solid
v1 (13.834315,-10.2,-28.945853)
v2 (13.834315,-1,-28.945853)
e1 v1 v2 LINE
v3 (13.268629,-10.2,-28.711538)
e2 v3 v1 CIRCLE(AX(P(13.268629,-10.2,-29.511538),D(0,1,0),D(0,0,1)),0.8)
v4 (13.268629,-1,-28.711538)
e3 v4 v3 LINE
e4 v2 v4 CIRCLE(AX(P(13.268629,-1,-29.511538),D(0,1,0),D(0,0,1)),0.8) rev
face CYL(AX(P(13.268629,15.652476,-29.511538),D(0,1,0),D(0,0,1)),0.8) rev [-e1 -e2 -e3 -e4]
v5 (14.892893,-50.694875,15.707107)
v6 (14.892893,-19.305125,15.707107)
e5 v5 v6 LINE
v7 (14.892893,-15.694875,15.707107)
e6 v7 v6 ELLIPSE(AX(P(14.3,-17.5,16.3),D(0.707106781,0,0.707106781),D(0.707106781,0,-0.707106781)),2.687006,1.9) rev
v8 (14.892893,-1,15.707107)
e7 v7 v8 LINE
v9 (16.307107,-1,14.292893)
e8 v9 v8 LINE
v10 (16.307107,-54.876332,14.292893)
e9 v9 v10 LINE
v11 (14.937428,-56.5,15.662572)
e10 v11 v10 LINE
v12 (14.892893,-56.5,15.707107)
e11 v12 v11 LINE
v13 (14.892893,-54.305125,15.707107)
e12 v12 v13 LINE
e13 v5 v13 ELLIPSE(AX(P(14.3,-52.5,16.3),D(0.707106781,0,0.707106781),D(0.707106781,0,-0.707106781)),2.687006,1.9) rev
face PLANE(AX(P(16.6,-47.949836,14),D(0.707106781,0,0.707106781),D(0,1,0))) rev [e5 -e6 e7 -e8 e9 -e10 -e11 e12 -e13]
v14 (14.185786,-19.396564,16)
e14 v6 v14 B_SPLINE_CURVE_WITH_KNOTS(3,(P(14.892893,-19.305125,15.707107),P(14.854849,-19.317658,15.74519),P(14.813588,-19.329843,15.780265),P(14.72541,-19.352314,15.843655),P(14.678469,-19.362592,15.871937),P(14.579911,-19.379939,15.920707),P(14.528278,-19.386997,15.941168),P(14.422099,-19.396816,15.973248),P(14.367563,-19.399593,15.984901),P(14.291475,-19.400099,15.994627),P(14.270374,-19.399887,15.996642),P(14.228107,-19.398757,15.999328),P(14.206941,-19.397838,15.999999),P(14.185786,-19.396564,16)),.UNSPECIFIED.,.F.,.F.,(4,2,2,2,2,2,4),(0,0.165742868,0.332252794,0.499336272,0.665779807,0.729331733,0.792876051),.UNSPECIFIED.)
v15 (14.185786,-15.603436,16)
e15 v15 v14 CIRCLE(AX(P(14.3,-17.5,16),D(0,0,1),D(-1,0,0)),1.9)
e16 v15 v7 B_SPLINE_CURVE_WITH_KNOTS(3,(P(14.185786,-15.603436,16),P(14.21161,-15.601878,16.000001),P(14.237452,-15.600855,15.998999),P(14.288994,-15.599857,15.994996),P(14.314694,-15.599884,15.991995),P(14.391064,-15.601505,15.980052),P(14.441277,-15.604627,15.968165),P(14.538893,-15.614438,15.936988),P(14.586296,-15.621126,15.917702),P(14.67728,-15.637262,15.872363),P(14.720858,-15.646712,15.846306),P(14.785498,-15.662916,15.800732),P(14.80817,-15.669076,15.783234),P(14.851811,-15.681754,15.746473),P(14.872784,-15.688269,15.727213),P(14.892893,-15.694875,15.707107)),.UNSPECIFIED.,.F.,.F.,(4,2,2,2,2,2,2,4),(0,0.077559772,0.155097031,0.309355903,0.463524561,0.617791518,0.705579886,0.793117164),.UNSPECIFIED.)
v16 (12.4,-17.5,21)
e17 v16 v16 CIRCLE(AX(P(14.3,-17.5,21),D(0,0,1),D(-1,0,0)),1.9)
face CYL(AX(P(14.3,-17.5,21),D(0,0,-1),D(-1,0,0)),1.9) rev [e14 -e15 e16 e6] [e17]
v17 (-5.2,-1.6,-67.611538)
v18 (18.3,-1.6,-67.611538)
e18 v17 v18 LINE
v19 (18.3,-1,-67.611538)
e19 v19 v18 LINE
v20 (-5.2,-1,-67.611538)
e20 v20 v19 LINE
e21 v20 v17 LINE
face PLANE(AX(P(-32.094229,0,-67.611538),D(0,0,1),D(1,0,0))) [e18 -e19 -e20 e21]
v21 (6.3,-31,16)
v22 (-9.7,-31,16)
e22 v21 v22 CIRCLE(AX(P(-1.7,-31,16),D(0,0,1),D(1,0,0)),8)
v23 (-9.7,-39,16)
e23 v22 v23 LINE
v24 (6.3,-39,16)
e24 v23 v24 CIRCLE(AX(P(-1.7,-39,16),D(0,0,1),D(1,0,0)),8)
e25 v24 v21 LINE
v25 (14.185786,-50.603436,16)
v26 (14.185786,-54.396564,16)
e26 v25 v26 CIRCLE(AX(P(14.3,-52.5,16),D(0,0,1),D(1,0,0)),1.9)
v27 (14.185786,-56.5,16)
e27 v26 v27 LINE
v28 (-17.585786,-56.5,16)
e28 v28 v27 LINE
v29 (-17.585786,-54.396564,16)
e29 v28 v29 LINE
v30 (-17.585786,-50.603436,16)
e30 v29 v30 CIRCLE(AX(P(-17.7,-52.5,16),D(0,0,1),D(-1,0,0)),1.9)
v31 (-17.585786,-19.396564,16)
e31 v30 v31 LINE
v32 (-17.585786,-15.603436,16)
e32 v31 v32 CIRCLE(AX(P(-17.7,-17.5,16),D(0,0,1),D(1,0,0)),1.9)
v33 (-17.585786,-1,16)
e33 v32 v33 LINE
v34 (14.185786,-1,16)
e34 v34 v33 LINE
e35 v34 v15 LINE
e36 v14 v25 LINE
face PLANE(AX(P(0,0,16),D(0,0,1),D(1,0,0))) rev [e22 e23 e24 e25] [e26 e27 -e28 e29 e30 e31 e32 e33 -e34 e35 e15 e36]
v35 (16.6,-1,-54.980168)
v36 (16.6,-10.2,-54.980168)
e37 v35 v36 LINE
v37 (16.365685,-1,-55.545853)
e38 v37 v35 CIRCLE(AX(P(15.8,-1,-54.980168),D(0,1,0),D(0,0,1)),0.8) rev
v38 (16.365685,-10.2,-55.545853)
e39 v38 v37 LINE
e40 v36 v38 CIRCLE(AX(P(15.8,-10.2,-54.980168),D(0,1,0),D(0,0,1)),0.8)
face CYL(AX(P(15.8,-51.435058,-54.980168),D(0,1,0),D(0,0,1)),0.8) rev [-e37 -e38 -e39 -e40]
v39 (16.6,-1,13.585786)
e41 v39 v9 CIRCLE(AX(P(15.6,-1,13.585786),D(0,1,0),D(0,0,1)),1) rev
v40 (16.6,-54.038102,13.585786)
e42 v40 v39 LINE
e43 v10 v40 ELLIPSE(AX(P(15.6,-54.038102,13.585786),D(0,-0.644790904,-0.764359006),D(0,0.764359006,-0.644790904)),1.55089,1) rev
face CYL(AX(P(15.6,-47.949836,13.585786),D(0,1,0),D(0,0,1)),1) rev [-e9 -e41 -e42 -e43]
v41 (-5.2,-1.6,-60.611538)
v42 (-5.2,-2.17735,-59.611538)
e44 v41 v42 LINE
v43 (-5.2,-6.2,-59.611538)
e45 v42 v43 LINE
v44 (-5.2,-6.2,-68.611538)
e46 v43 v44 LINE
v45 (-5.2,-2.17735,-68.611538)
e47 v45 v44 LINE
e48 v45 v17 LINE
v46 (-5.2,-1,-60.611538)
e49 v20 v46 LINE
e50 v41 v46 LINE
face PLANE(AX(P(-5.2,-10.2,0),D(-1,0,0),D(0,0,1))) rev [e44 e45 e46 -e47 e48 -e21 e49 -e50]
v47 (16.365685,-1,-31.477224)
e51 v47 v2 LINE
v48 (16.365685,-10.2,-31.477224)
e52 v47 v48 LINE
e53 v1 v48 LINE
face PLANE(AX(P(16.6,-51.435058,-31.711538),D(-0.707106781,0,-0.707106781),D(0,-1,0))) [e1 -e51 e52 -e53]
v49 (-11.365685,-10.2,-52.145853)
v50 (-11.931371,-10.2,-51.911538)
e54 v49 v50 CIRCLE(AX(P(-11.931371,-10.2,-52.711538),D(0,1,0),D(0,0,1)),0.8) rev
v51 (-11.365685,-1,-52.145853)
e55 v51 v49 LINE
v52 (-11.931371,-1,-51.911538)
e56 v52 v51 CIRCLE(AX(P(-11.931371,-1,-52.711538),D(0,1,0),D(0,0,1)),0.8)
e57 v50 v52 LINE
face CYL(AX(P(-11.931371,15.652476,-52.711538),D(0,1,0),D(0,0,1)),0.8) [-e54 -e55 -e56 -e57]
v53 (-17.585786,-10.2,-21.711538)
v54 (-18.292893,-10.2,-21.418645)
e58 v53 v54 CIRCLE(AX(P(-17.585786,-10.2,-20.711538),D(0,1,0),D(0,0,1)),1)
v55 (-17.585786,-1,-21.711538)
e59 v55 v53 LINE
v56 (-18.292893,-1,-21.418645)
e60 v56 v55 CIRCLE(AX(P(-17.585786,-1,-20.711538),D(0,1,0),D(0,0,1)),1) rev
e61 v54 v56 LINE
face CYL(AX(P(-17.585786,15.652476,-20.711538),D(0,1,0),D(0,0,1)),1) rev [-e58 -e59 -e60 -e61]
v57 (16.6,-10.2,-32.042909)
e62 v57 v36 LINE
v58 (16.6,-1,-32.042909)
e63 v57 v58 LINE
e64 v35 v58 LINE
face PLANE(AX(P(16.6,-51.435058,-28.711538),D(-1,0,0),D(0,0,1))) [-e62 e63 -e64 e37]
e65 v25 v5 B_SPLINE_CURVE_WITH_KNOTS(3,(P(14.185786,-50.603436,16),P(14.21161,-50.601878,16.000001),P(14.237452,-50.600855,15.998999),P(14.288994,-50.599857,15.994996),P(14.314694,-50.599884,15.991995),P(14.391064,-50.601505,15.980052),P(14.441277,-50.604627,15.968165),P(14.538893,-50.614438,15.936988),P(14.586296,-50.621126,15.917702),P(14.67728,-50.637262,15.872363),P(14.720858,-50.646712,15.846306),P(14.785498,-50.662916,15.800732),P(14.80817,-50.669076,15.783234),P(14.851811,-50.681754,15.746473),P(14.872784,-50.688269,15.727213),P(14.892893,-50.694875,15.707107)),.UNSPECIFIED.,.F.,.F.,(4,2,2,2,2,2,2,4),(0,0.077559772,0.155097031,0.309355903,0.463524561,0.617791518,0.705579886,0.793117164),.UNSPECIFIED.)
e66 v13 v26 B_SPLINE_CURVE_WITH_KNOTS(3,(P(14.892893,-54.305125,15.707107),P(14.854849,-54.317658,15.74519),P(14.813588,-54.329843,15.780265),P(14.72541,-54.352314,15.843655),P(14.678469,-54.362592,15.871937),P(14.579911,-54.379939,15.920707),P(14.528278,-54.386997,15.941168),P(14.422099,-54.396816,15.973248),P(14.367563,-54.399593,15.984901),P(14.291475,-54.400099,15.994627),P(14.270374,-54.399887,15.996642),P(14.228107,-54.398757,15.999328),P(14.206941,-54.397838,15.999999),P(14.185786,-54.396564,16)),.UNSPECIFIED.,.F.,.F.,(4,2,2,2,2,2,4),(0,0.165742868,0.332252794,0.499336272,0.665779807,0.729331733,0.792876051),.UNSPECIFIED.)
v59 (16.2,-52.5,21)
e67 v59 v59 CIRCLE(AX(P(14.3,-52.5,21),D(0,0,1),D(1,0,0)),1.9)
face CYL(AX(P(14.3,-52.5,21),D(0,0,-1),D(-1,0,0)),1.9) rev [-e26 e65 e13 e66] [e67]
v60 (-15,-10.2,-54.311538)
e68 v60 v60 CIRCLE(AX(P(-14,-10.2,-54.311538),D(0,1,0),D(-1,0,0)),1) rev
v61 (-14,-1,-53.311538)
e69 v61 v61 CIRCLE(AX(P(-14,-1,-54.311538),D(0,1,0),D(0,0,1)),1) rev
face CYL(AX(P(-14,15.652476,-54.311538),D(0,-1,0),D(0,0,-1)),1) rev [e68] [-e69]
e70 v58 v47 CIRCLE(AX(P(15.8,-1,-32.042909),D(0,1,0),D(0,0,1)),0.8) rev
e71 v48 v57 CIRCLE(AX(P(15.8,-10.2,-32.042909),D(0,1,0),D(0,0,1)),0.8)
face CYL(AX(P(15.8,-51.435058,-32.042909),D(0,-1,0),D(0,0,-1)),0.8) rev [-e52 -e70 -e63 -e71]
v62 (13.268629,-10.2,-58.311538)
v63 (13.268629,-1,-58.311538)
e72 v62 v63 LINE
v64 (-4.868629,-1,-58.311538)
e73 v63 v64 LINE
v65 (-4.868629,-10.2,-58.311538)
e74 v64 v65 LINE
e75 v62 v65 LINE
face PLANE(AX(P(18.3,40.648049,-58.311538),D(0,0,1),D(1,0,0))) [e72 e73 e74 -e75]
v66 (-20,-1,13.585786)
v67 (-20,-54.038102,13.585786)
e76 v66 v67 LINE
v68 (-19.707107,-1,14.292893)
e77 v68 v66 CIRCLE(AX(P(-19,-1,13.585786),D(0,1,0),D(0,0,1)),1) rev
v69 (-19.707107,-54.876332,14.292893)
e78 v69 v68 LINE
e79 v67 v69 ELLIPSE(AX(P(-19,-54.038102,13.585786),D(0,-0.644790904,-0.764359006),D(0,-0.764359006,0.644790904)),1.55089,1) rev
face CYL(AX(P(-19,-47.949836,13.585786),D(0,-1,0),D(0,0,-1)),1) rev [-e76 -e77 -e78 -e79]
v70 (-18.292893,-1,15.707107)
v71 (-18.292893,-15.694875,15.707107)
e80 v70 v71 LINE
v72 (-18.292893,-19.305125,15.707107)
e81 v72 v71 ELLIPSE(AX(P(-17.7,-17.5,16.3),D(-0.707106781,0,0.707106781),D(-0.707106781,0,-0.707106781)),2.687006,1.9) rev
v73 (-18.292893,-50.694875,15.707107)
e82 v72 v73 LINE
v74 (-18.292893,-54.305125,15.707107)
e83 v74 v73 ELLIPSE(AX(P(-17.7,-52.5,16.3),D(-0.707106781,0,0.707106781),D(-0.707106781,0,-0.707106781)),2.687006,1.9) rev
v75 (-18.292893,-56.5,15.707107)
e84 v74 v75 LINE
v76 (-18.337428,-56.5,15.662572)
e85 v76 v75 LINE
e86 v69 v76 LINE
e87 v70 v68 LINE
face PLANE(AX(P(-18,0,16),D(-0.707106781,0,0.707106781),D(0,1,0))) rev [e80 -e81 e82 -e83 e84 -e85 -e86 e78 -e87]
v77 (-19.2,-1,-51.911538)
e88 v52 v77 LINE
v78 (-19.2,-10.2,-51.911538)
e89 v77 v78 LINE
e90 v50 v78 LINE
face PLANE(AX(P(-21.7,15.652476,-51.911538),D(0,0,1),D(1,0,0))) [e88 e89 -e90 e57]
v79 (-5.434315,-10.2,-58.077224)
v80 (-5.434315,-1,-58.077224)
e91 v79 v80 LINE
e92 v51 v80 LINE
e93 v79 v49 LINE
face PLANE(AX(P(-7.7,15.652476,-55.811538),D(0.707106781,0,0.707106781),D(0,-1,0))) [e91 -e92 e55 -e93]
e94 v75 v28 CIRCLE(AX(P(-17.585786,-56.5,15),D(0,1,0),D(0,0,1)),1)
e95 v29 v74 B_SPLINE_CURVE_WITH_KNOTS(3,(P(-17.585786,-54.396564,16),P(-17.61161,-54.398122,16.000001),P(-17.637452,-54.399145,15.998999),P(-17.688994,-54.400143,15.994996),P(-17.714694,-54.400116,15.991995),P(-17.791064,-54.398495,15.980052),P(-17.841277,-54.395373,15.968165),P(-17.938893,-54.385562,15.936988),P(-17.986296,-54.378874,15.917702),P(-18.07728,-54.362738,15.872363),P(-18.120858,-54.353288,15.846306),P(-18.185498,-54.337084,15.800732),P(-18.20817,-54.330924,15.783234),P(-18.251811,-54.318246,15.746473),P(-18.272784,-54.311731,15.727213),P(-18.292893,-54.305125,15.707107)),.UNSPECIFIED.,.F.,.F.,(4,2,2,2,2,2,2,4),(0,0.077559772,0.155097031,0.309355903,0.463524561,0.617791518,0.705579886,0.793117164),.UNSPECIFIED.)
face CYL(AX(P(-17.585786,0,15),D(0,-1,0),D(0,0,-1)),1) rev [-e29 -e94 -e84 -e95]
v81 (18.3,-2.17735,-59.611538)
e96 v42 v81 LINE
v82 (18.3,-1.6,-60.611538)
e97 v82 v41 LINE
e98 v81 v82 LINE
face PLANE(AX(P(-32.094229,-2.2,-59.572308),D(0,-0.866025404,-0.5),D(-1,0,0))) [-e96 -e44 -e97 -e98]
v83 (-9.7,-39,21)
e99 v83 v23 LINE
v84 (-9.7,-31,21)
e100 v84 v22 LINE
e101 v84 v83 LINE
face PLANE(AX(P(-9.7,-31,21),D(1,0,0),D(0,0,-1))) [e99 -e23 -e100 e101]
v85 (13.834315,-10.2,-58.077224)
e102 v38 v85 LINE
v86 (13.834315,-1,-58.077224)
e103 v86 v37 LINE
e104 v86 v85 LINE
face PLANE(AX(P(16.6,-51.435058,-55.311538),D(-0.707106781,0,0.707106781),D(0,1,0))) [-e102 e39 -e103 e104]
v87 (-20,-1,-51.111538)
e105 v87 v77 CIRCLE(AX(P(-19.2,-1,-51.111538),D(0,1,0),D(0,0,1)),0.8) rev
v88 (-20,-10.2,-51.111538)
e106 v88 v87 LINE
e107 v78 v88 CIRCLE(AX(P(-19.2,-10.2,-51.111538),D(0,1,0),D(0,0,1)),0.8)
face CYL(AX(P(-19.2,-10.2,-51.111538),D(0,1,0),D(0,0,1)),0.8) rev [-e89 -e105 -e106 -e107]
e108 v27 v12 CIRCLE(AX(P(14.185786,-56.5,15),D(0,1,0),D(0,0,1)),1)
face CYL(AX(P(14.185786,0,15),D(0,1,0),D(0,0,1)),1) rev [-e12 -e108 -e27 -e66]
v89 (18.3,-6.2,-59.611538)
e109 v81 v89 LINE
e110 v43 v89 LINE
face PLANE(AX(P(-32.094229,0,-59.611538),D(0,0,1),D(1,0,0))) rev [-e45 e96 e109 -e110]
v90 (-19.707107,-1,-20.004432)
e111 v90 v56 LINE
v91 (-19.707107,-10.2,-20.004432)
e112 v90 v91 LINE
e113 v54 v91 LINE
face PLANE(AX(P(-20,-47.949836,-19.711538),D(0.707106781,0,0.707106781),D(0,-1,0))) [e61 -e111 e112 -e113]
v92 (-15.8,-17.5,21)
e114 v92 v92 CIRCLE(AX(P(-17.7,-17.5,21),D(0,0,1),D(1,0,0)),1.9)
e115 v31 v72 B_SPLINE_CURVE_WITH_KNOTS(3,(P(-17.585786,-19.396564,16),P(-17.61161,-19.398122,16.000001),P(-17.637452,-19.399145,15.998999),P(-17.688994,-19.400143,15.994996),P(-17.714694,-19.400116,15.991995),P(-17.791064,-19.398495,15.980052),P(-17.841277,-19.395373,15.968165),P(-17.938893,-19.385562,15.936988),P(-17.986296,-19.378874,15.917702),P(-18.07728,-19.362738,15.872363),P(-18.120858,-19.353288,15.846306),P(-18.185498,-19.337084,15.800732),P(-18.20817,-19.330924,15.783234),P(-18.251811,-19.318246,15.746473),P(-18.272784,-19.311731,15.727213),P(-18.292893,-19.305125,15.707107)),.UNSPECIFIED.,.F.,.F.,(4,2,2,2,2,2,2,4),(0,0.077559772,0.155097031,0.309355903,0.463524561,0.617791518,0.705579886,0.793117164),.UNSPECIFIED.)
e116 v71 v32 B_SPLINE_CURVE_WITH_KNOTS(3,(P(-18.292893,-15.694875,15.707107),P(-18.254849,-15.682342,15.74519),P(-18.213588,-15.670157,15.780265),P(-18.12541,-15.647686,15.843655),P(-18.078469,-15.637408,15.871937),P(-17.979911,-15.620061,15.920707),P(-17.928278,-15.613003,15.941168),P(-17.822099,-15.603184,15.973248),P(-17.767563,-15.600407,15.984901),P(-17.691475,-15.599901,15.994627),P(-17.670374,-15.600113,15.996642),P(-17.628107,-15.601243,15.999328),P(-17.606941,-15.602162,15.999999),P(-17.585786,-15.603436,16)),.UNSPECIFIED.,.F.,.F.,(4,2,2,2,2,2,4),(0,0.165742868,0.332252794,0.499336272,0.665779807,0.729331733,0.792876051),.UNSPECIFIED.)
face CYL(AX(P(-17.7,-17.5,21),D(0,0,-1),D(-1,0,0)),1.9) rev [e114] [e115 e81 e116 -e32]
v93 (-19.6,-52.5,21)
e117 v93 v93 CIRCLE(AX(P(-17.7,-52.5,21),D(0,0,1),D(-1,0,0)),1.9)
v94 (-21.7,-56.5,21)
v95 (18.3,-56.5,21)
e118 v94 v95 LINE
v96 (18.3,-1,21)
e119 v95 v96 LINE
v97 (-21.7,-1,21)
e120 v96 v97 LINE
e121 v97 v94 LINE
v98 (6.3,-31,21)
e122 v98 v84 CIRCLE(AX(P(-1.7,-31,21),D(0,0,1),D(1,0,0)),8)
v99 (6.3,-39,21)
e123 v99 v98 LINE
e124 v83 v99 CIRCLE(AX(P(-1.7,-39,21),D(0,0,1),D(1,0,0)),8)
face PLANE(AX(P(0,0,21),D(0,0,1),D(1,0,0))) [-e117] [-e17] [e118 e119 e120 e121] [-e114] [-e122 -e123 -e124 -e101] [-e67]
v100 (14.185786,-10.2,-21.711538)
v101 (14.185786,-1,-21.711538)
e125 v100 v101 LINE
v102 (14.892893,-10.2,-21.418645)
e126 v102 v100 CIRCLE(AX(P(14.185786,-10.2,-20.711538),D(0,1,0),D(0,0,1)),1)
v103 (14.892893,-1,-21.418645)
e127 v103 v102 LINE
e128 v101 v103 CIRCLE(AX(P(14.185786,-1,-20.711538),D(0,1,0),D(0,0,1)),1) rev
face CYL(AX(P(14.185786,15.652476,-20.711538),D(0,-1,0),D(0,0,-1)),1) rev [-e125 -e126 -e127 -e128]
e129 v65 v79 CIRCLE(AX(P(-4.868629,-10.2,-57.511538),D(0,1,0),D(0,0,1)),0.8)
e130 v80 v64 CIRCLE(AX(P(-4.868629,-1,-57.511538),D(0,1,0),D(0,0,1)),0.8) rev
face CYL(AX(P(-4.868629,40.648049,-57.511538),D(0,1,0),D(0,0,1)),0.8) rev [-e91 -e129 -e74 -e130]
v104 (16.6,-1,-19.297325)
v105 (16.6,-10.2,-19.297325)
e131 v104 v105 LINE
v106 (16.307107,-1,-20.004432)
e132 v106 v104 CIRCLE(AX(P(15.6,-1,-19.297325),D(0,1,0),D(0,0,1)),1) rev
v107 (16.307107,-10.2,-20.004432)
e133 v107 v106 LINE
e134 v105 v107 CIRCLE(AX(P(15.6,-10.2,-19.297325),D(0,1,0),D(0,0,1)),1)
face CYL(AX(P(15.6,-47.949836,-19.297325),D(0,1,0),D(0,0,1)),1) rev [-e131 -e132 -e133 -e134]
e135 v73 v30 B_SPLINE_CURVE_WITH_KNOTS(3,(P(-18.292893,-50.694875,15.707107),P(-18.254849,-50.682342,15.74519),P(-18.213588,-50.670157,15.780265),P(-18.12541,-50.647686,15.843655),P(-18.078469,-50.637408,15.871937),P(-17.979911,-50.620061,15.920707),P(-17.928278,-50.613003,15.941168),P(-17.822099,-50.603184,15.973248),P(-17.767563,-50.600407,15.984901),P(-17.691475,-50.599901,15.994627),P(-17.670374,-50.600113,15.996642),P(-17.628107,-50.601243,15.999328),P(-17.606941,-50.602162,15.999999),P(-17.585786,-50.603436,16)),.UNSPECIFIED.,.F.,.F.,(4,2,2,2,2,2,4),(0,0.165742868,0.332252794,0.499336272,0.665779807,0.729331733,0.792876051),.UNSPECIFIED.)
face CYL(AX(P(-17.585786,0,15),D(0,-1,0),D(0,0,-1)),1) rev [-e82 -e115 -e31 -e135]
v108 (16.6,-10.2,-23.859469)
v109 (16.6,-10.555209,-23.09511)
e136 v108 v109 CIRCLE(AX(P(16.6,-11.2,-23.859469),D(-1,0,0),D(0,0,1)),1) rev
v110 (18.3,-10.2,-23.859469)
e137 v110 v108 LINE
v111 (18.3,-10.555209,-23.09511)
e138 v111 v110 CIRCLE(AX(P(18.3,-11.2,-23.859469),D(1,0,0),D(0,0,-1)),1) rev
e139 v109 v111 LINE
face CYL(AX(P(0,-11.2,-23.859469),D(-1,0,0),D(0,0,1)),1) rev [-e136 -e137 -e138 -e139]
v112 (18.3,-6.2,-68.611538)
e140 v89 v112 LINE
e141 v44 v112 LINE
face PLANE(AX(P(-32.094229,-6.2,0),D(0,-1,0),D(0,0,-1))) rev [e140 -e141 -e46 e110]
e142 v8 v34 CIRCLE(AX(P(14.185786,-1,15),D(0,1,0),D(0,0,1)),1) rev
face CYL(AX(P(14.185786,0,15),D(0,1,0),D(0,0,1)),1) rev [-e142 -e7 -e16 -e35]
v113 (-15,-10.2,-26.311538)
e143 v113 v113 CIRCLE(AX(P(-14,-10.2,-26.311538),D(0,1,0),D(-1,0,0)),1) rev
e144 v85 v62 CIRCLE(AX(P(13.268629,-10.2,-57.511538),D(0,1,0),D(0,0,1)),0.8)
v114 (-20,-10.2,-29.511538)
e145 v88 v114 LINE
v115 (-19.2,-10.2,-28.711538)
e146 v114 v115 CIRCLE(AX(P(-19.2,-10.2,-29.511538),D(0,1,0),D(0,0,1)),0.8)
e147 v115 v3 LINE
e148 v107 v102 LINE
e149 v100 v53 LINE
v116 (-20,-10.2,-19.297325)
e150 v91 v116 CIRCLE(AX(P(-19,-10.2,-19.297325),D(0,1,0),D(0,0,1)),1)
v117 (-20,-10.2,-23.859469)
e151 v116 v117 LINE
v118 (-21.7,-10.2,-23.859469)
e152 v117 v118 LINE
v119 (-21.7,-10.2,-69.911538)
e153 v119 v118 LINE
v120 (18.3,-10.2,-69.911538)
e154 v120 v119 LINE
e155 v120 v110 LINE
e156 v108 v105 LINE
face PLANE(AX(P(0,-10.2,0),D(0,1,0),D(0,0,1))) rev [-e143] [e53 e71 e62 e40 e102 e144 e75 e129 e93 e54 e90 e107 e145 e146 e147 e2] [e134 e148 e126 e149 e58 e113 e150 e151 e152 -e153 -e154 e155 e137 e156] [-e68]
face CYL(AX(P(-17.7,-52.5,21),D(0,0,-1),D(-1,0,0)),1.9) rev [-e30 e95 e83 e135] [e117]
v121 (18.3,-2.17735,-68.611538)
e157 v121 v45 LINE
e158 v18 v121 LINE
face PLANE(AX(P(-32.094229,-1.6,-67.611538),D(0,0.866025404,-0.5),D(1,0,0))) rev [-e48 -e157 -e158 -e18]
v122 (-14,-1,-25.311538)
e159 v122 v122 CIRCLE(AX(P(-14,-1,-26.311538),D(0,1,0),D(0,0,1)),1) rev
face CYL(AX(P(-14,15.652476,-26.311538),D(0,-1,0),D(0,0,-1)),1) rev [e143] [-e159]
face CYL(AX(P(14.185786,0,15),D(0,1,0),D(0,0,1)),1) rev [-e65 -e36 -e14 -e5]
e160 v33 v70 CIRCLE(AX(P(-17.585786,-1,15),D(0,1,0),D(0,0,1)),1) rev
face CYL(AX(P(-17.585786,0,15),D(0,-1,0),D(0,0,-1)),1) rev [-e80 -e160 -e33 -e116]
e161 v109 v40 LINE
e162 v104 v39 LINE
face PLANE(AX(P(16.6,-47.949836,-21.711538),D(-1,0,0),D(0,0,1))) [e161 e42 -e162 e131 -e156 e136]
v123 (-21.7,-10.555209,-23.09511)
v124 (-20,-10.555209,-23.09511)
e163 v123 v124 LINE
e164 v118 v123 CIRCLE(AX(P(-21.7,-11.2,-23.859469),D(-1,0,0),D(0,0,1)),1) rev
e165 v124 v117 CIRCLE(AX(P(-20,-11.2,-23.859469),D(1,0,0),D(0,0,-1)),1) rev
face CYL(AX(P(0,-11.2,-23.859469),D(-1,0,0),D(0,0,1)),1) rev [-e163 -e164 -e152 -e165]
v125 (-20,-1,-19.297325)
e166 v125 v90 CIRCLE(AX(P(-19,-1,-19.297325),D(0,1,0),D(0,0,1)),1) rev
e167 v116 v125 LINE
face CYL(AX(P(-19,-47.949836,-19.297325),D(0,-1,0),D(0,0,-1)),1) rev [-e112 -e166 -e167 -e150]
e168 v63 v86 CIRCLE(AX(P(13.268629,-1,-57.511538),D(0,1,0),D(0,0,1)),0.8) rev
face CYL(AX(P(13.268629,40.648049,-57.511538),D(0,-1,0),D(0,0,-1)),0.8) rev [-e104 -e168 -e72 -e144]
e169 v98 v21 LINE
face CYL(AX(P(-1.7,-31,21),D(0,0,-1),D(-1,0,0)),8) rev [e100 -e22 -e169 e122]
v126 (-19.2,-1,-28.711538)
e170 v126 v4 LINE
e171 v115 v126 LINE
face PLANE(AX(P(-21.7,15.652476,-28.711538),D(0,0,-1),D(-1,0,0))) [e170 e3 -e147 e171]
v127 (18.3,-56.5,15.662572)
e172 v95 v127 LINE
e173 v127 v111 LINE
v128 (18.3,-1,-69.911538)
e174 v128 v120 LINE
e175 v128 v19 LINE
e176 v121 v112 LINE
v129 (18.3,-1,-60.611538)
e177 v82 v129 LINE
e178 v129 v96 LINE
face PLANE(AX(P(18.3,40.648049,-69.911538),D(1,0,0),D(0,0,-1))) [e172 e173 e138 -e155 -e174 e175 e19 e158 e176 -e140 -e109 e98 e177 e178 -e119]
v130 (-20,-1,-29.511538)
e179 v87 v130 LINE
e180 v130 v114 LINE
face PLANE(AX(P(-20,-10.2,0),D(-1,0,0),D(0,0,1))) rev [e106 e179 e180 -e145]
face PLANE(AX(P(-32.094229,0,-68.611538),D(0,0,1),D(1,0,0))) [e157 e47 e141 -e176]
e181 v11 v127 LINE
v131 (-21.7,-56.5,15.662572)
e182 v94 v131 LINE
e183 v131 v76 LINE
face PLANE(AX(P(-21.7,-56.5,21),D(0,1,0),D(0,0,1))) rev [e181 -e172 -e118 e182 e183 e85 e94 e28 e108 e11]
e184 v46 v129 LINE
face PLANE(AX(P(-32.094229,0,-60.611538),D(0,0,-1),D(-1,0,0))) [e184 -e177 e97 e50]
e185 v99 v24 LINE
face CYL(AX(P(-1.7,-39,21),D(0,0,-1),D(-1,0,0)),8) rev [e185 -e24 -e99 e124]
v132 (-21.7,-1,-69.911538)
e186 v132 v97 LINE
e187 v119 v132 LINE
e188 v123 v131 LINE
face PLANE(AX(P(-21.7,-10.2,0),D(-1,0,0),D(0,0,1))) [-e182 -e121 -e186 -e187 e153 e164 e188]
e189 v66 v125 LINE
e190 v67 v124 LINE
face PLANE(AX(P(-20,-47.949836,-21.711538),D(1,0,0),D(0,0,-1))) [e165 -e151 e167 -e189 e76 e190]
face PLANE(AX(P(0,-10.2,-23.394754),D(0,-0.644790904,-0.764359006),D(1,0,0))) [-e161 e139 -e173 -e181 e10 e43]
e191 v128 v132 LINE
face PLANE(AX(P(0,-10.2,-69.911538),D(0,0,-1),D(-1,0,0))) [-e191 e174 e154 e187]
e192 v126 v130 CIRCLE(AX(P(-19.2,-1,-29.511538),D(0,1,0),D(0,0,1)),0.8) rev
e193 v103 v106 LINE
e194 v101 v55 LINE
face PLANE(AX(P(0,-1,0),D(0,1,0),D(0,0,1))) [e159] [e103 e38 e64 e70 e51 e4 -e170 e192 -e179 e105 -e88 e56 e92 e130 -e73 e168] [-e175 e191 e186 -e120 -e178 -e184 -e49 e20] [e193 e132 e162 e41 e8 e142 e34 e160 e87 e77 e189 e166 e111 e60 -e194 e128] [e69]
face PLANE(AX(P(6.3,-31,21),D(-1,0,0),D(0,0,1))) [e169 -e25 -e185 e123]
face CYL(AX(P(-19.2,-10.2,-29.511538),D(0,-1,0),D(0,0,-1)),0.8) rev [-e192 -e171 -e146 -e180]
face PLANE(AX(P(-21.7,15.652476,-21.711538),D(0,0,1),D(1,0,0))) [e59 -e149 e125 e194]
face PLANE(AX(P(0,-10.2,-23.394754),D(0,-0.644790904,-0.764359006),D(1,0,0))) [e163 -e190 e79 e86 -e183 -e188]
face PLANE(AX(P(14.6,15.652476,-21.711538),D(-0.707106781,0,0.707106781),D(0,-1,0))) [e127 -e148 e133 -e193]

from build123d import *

# Parameters (mm, degrees)
BOSS_EXTRUDE1_START      = -1
SKETCH1_W                = 1.7
SKETCH1_H                = 89.2
BOSS_EXTRUDE1_DEPTH      = 9.2
SKETCH4_W                = 40
SKETCH4_H                = 11.6
BOSS_EXTRUDE3_DEPTH      = 9.2
SERVO_HOLDER_DEPTH       = 1
SERVO_HOLDER_DEPTH_BACK  = 9.2
SKETCH3_W                = 14
SKETCH3_H                = 7
SKETCH3_R                = 1
SKETCH37_W               = 26
SKETCH37_H               = 7
BOSS_EXTRUDE19_DEPTH     = 10.2
CUT_EXTRUDE10_DEPTH      = 93.482268571
CUT_EXTRUDE10_DEPTH_BACK = 93.482268571
SKETCH29_W               = 49.101454262
SKETCH29_H               = 5.977389624
BOSS_EXTRUDE17_DEPTH     = 3
SKETCH39_W               = 1.7
SKETCH39_H               = 41.2
BOSS_EXTRUDE20_DEPTH     = 9.2
CUT_EXTRUDE13_DEPTH      = 23.5
CHAMFER2_SIZE            = 0.6
CHAMFER2_SIZE_2          = 1.039230485
CHAMFER3_SIZE            = 3
CHAMFER4_SIZE            = 2.5
CUT_EXTRUDE16_DEPTH      = 10
FILLET11_R               = 0.8
SKETCH51_W               = 40
SKETCH51_H               = 41
CUT_EXTRUDE17_DEPTH      = 10
SKETCH50_W               = 40
SKETCH50_H               = 55.5
SKETCH50_R               = 1.9
BOSS_EXTRUDE24_DEPTH     = 5
SKETCH53_W               = 1.7
SKETCH53_H               = 37.711538462
BOSS_EXTRUDE25_DEPTH     = 9.2
CHAMFER6_START           = -21.7
CHAMFER6_DEPTH           = 1.7
CHAMFER6_START_2         = 16.6
CHAMFER6_2_DEPTH         = 1.7
CHAMFER5_SIZE            = 2
FILLET13_R               = 1


with BuildPart() as part:
    # Sketch1 → Boss-Extrude1 (new body)
    with BuildSketch(Plane(origin=(0, 0, 0), x_dir=(1, 0, 0), z_dir=(0, 1, 0)).offset(BOSS_EXTRUDE1_START)):
        with Locations((-20.85, 25.311538462)):
            Rectangle(SKETCH1_W, SKETCH1_H)
    extrude(amount=-BOSS_EXTRUDE1_DEPTH)

    # Sketch4 → Boss-Extrude3 (add)
    with BuildSketch(Plane.XZ.offset(10.2)):
        with Locations((-1.7, -64.111538462)):
            Rectangle(SKETCH4_W, SKETCH4_H)
    extrude(amount=-BOSS_EXTRUDE3_DEPTH)

    # Sketch3 → Servo Holder (add, two sides: drawn at the far end of the back side and taken through both)
    # profile 1 of 2: a face of its own
    with BuildSketch(Plane.XZ.offset(10.2).offset(-SERVO_HOLDER_DEPTH_BACK)):
        with Locations((-14.7, -55.411538462)):
            Rectangle(SKETCH3_W, SKETCH3_H)
        with Locations(Location((-14, -54.311538462, 0), (0, 0, 270))):
            Circle(SKETCH3_R, mode=Mode.SUBTRACT)
    # profile 2 of 2: a face of its own
    with BuildSketch(Plane.XZ.offset(10.2).offset(-SERVO_HOLDER_DEPTH_BACK)):
        with Locations((-14.7, -25.211538462)):
            Rectangle(SKETCH3_W, SKETCH3_H)
        with Locations(Location((-14, -26.311538462, 0), (0, 0, 90))):
            Circle(SKETCH3_R, mode=Mode.SUBTRACT)
    extrude(amount=SERVO_HOLDER_DEPTH + SERVO_HOLDER_DEPTH_BACK)

    # Sketch37 → Boss-Extrude19 (add)
    with BuildSketch(Plane(origin=(0, -1, 0), x_dir=(1, 0, 0), z_dir=(0, 1, 0))):
        with Locations((5.3, 25.211538462)):
            Rectangle(SKETCH37_W, SKETCH37_H)
    extrude(amount=-BOSS_EXTRUDE19_DEPTH)

    # Sketch29 → Cut-Extrude10 (cut, two sides: drawn at the far end of the back side and taken through both)
    with BuildSketch(Plane(origin=(0, 0, -69.911538462), x_dir=(-1, 0, 0), z_dir=(0, 0, -1)).offset(-CUT_EXTRUDE10_DEPTH_BACK)):
        with Locations((-2.850727131, -13.188694812)):
            Rectangle(SKETCH29_W, SKETCH29_H)
    extrude(amount=CUT_EXTRUDE10_DEPTH + CUT_EXTRUDE10_DEPTH_BACK, mode=Mode.SUBTRACT)

    # Sketch35 → Boss-Extrude17 (add)
    with BuildSketch(Plane(origin=(18.3, 0, 0), x_dir=(0, 0, -1), z_dir=(1, 0, 0))):
        Polygon((-2, -1), (21.711538462, -1), (21.711538462, -10.2), (-19.288461538, -10.2), (-19.288461538, -1), align=None)
    extrude(amount=-BOSS_EXTRUDE17_DEPTH)

    # Sketch39 → Boss-Extrude20 (add)
    with BuildSketch(Plane(origin=(0, -1, 0), x_dir=(1, 0, 0), z_dir=(0, 1, 0))):
        with Locations((17.45, 49.311538462)):
            Rectangle(SKETCH39_W, SKETCH39_H)
    extrude(amount=-BOSS_EXTRUDE20_DEPTH)

    # Sketch40 → Cut-Extrude13 (cut)
    with BuildSketch(Plane(origin=(18.3, 0, 0), x_dir=(0, 0, -1), z_dir=(1, 0, 0))):
        Polygon((64.111538462, -1), (60.611538462, -1), (60.611538462, -2.2), (59.611538462, -2.2), (59.611538462, -6.2), (64.111538462, -6.2), align=None)
        Polygon((67.611538462, -1), (64.111538462, -1), (64.111538462, -6.2), (68.611538462, -6.2), (68.611538462, -2.2), (67.611538462, -2.2), align=None)
    extrude(amount=-CUT_EXTRUDE13_DEPTH, mode=Mode.SUBTRACT)

    # Chamfer2
    # the kernel refuses this chamfer: 1.039230485, 0.6 mm, written as the material it takes off along each edge
    with BuildSketch(Plane(origin=(20.988578382, -2.2, -60.611538462), x_dir=(0, 1, 0), z_dir=(-1, 0, 0))) as chamfer2_piece_1_section:
        Polygon((CHAMFER2_SIZE, 0), (0, -CHAMFER2_SIZE_2), (0, 0), align=None)
    chamfer2_piece_1 = extrude(amount=26.188578382, mode=Mode.PRIVATE)
    chamfer2_piece_1 = split(chamfer2_piece_1, bisect_by=Plane(origin=(20.988578382, -2.2, -59.611538462), z_dir=(0, 0, -1)), keep=Keep.TOP, mode=Mode.PRIVATE)
    add(chamfer2_piece_1, mode=Mode.SUBTRACT)
    with BuildSketch(Plane(origin=(20.988578382, -2.2, -67.611538462), x_dir=(0, 1, 0), z_dir=(-1, 0, 0))) as chamfer2_piece_2_section:
        Polygon((CHAMFER2_SIZE, 0), (0, CHAMFER2_SIZE_2), (0, 0), align=None)
    chamfer2_piece_2 = extrude(amount=26.188578382, mode=Mode.PRIVATE)
    chamfer2_piece_2 = split(chamfer2_piece_2, bisect_by=Plane(origin=(20.988578382, -2.2, -68.611538462), z_dir=(0, 0, 1)), keep=Keep.TOP, mode=Mode.PRIVATE)
    add(chamfer2_piece_2, mode=Mode.SUBTRACT)

    # Chamfer3
    chamfer3_edges = [part.edges().sort_by_distance(p)[0] for p in [
        (16.6, -5.6, -58.311538462),
        (16.6, -5.6, -28.711538462),
    ]]
    chamfer(chamfer3_edges, length=CHAMFER3_SIZE)

    # Chamfer4
    chamfer4_edges = [part.edges().sort_by_distance(p)[0] for p in [
        (-7.7, -5.6, -58.311538462),
    ]]
    chamfer(chamfer4_edges, length=CHAMFER4_SIZE)

    # Sketch43 → Cut-Extrude16 (cut)
    with BuildSketch(Plane(origin=(0, -1, 0), x_dir=(1, 0, 0), z_dir=(0, 1, 0))):
        Polygon((-5.2, 58.311538462), (-11.6, 51.911538462), (-5.2, 51.911538462), align=None)
    extrude(amount=-CUT_EXTRUDE16_DEPTH, mode=Mode.SUBTRACT)

    # Fillet11
    fillet11_edges = [part.edges().sort_by_distance(p)[0] for p in [
        (16.6, -5.6, -55.311538462),
        (16.6, -5.6, -31.711538462),
        (13.6, -5.6, -28.711538462),
        (13.6, -5.6, -58.311538462),
        (-5.2, -5.6, -58.311538462),
        (-11.6, -5.6, -51.911538462),
        (-20, -5.6, -51.911538462),
        (-20, -5.6, -28.711538462),
    ]]
    fillet(fillet11_edges, radius=FILLET11_R)

    # Sketch51 → Cut-Extrude17 (cut)
    with BuildSketch(Plane(origin=(0, -1, 0), x_dir=(1, 0, 0), z_dir=(0, 1, 0))):
        with Locations((-1.7, 1.211538462)):
            Rectangle(SKETCH51_W, SKETCH51_H)
    extrude(amount=-CUT_EXTRUDE17_DEPTH, mode=Mode.SUBTRACT)



with BuildPart() as body_2:
    # Sketch50 → Boss-Extrude24 (new body)
    with BuildSketch(Plane.XY.offset(16)):
        with Locations((-1.7, -28.75)):
            Rectangle(SKETCH50_W, SKETCH50_H)
        with Locations((-17.7, -17.5)):
            Circle(SKETCH50_R, mode=Mode.SUBTRACT)
        with Locations(Location((14.3, -17.5, 0), (0, 0, 180))):
            Circle(SKETCH50_R, mode=Mode.SUBTRACT)
        with Locations((14.3, -52.5)):
            Circle(SKETCH50_R, mode=Mode.SUBTRACT)
        with Locations(Location((-17.7, -52.5, 0), (0, 0, 180))):
            Circle(SKETCH50_R, mode=Mode.SUBTRACT)
        with BuildLine():
            Line((6.3, -31), (6.3, -39))
            ThreePointArc((6.3, -39), (-1.7, -47), (-9.7, -39))
            Line((-9.7, -39), (-9.7, -31))
            ThreePointArc((-9.7, -31), (-1.7, -23), (6.3, -31))
        make_face(mode=Mode.SUBTRACT)
    extrude(amount=BOSS_EXTRUDE24_DEPTH)


with BuildPart() as part_1:
    add(part.part)

    add(body_2.part)  # Boss-Extrude25 merges body 2
    # Sketch53 → Boss-Extrude25 (add)
    with BuildSketch(Plane(origin=(0, -1, 0), x_dir=(1, 0, 0), z_dir=(0, 1, 0))):
        with Locations((17.45, 2.855769231)):
            Rectangle(SKETCH53_W, SKETCH53_H)
        with Locations((-20.85, 2.855769231)):
            Rectangle(SKETCH53_W, SKETCH53_H)
    extrude(amount=-BOSS_EXTRUDE25_DEPTH)

    # Chamfer6: read off the stored shape, not the designer's step
    # Chamfer6 outline → Chamfer6 (add)
    with BuildSketch(Plane.YZ.offset(CHAMFER6_START)):
        Polygon((-56.5, 16), (-56.5, 15.662571698), (-10.2, -23.394754297), (-10.2, 16), align=None)
    extrude(amount=CHAMFER6_DEPTH)

    # Chamfer6 2 outline → Chamfer6 2 (add)
    with BuildSketch(Plane.YZ.offset(CHAMFER6_START_2)):
        Polygon((-56.5, 16), (-56.5, 15.662571698), (-10.2, -23.394754297), (-10.2, 16), align=None)
    extrude(amount=CHAMFER6_2_DEPTH)

    # Chamfer5
    # the kernel refuses this chamfer: 2 mm, written as the material it adds along each edge
    with BuildSketch(Plane(origin=(16.6, -1, -21.711538462), x_dir=(-1, 0, 0), z_dir=(0, -1, 0)), Plane(origin=(-20, -1, -21.711538462), x_dir=(0, 0, 1), z_dir=(0, -1, 0))) as chamfer5_piece_1:
        Polygon((CHAMFER5_SIZE, 0), (0, -CHAMFER5_SIZE), (0, 0), align=None)
    extrude(amount=9.2)
    with BuildSketch(Plane(origin=(16.6, -56.5, 16), x_dir=(-1, 0, 0), z_dir=(0, 1, 0))) as chamfer5_piece_2_section:
        Polygon((CHAMFER5_SIZE, 0), (0, -CHAMFER5_SIZE), (0, 0), align=None)
    chamfer5_piece_2 = extrude(amount=55.5, mode=Mode.PRIVATE)
    chamfer5_piece_2 = chamfer5_piece_2 - Plane(origin=(14.3, -52.5, 16), x_dir=(1, 0, 0), z_dir=(0, 0, -1)) * Cylinder(1.9, 119, mode=Mode.PRIVATE)
    chamfer5_piece_2 = chamfer5_piece_2 - Plane(origin=(14.3, -17.5, 16), x_dir=(-1, 0, 0), z_dir=(0, 0, -1)) * Cylinder(1.9, 119, mode=Mode.PRIVATE)
    chamfer5_piece_2 = split(chamfer5_piece_2, bisect_by=Plane(origin=(16.6, -56.666302124, 15.802859306), z_dir=(0, 0.6447909042653838, 0.7643590058190123)), keep=Keep.TOP, mode=Mode.PRIVATE)
    add(chamfer5_piece_2)
    with BuildSketch(Plane(origin=(-20, -56.5, 16), x_dir=(1, 0, 0), z_dir=(0, 1, 0))) as chamfer5_piece_3_section:
        Polygon((CHAMFER5_SIZE, 0), (0, CHAMFER5_SIZE), (0, 0), align=None)
    chamfer5_piece_3 = extrude(amount=55.5, mode=Mode.PRIVATE)
    chamfer5_piece_3 = chamfer5_piece_3 - Plane(origin=(-17.7, -52.5, 16), x_dir=(-1, 0, 0), z_dir=(0, 0, -1)) * Cylinder(1.9, 119, mode=Mode.PRIVATE)
    chamfer5_piece_3 = chamfer5_piece_3 - Plane(origin=(-17.7, -17.5, 16), x_dir=(1, 0, 0), z_dir=(0, 0, -1)) * Cylinder(1.9, 119, mode=Mode.PRIVATE)
    chamfer5_piece_3 = split(chamfer5_piece_3, bisect_by=Plane(origin=(-20, -56.666302124, 15.802859306), z_dir=(0, 0.6447909042653838, 0.7643590058190123)), keep=Keep.TOP, mode=Mode.PRIVATE)
    add(chamfer5_piece_3)

    # Fillet13
    # the kernel refuses this fillet: 1 mm, written as the material it adds along each edge
    with BuildSketch(Plane(origin=(16.6, -55.564659873, 14), x_dir=(-0.7071067811865454, 0, 0.7071067811865497), z_dir=(0, 1, 0))) as fillet13_piece_1_section:
        with BuildLine():
            CenterArc((FILLET13_R * 0.414213562373, -FILLET13_R), FILLET13_R, 90, 45)
            Line((-FILLET13_R * 0.292893218813, -FILLET13_R * 0.292893218813), (0, 0))
            Line((0, 0), (FILLET13_R * 0.414213562373, 0))
        make_face()
    fillet13_piece_1 = extrude(amount=54.564659873, mode=Mode.PRIVATE)
    fillet13_piece_1 = split(fillet13_piece_1, bisect_by=Plane(origin=(16.6, -55.134131152, 14.510364682), z_dir=(0, 0.6447909042651655, 0.7643590058191962)), keep=Keep.TOP, mode=Mode.PRIVATE)
    add(fillet13_piece_1)
    with BuildSketch(Plane(origin=(14.6, -16.659367602, 16), x_dir=(0.7071067811865475, 0, -0.7071067811865475), z_dir=(0, 1, 0))) as fillet13_piece_2_section:
        with BuildLine():
            CenterArc((FILLET13_R * 0.414213562373, FILLET13_R), FILLET13_R, 225, 45)
            Line((-FILLET13_R * 0.292893218813, FILLET13_R * 0.292893218813), (0, 0))
            Line((0, 0), (FILLET13_R * 0.414213562373, 0))
        make_face()
    fillet13_piece_2 = extrude(amount=15.659367602, mode=Mode.PRIVATE)
    fillet13_piece_2 = fillet13_piece_2 - Plane(origin=(14.3, -17.5, 16), x_dir=(-1, 0, 0), z_dir=(0, 0, -1)) * Cylinder(1.9, 33, mode=Mode.PRIVATE)
    add(fillet13_piece_2)
    with BuildSketch(Plane(origin=(14.6, -56.5, 16), x_dir=(0.7071067811865475, 0, -0.7071067811865475), z_dir=(0, 1, 0))) as fillet13_piece_3_section:
        with BuildLine():
            CenterArc((FILLET13_R * 0.414213562373, FILLET13_R), FILLET13_R, 225, 45)
            Line((-FILLET13_R * 0.292893218813, FILLET13_R * 0.292893218813), (0, 0))
            Line((0, 0), (FILLET13_R * 0.414213562373, 0))
        make_face()
    fillet13_piece_3 = extrude(amount=3.159367602, mode=Mode.PRIVATE)
    fillet13_piece_3 = fillet13_piece_3 - Plane(origin=(14.3, -52.5, 16), x_dir=(1, 0, 0), z_dir=(0, 0, -1)) * Cylinder(1.9, 8, mode=Mode.PRIVATE)
    add(fillet13_piece_3)
    with BuildSketch(Plane(origin=(16.6, -1, -19.711538462), x_dir=(0, 0, 1), z_dir=(0, -1, 0)), Plane(origin=(-18, -1, -21.711538462), x_dir=(1.0, 0, -1.0978572219633363e-12), z_dir=(0, -1, 0)), Plane(origin=(-20, -1, -19.711538462), x_dir=(0.7071067811865475, 0, -0.7071067811865475), z_dir=(0, -1, 0))) as fillet13_piece_4:
        with BuildLine():
            CenterArc((FILLET13_R * 0.414213562373, FILLET13_R), FILLET13_R, 225, 45)
            Line((-FILLET13_R * 0.292893218813, FILLET13_R * 0.292893218813), (0, 0))
            Line((0, 0), (FILLET13_R * 0.414213562373, 0))
        make_face()
    extrude(amount=9.2)
    with BuildSketch(Plane(origin=(14.6, -1, -21.711538462), x_dir=(-1.0, 0, -1.0978572219633363e-12), z_dir=(0, -1, 0))) as fillet13_piece_5:
        with BuildLine():
            CenterArc((FILLET13_R * 0.414213562372, -FILLET13_R), FILLET13_R, 90, 45)
            Line((-FILLET13_R * 0.292893218814, -FILLET13_R * 0.292893218813), (0, 0))
            Line((0, 0), (FILLET13_R * 0.414213562373, 0))
        make_face()
    extrude(amount=9.2)
    with BuildSketch(Plane(origin=(-18, -56.5, 16), x_dir=(-0.7071067811865475, 0, -0.7071067811865475), z_dir=(0, 1, 0))) as fillet13_piece_6_section:
        with BuildLine():
            CenterArc((FILLET13_R * 0.414213562373, -FILLET13_R), FILLET13_R, 90, 45)
            Line((-FILLET13_R * 0.292893218813, -FILLET13_R * 0.292893218813), (0, 0))
            Line((0, 0), (FILLET13_R * 0.414213562373, 0))
        make_face()
    fillet13_piece_6 = extrude(amount=3.159367602, mode=Mode.PRIVATE)
    fillet13_piece_6 = fillet13_piece_6 - Plane(origin=(-17.7, -52.5, 16), x_dir=(-1, 0, 0), z_dir=(0, 0, -1)) * Cylinder(1.9, 8, mode=Mode.PRIVATE)
    add(fillet13_piece_6)
    with BuildSketch(Plane(origin=(-18, -16.659367602, 16), x_dir=(-0.7071067811865475, 0, -0.7071067811865475), z_dir=(0, 1, 0))) as fillet13_piece_7_section:
        with BuildLine():
            CenterArc((FILLET13_R * 0.414213562373, -FILLET13_R), FILLET13_R, 90, 45)
            Line((-FILLET13_R * 0.292893218813, -FILLET13_R * 0.292893218813), (0, 0))
            Line((0, 0), (FILLET13_R * 0.414213562373, 0))
        make_face()
    fillet13_piece_7 = extrude(amount=15.659367602, mode=Mode.PRIVATE)
    fillet13_piece_7 = fillet13_piece_7 - Plane(origin=(-17.7, -17.5, 16), x_dir=(1, 0, 0), z_dir=(0, 0, -1)) * Cylinder(1.9, 33, mode=Mode.PRIVATE)
    add(fillet13_piece_7)
    with BuildSketch(Plane(origin=(-20, -55.564659873, 14), x_dir=(0.7071067811865475, 0, 0.7071067811865475), z_dir=(0, 1, 0))) as fillet13_piece_8_section:
        with BuildLine():
            CenterArc((FILLET13_R * 0.414213562373, FILLET13_R), FILLET13_R, 225, 45)
            Line((-FILLET13_R * 0.292893218813, FILLET13_R * 0.292893218813), (0, 0))
            Line((0, 0), (FILLET13_R * 0.414213562373, 0))
        make_face()
    fillet13_piece_8 = extrude(amount=54.564659873, mode=Mode.PRIVATE)
    fillet13_piece_8 = split(fillet13_piece_8, bisect_by=Plane(origin=(-20, -55.134131152, 14.510364682), z_dir=(0, 0.6447909042651655, 0.7643590058191962)), keep=Keep.TOP, mode=Mode.PRIVATE)
    add(fillet13_piece_8)
    with BuildSketch(Plane(origin=(16.6, -10.2, -23.394754297), x_dir=(0, 0, -1), z_dir=(1, 0, 0)), Plane(origin=(-21.7, -10.2, -23.394754297), x_dir=(0, 0, -1), z_dir=(1, 0, 0))) as fillet13_piece_9:
        with BuildLine():
            CenterArc((FILLET13_R * 0.464715000429, -FILLET13_R), FILLET13_R, 90, 49.85)
            Line((-FILLET13_R * 0.29964400539, -FILLET13_R * 0.355209095735), (0, 0))
            Line((0, 0), (FILLET13_R * 0.464715000429, 0))
        make_face()
    extrude(amount=1.7)
    with BuildSketch(Plane(origin=(-18, -51.659367602, 16), x_dir=(-0.7071067811865475, 0, -0.7071067811865475), z_dir=(0, 1, 0))) as fillet13_piece_10_section:
        with BuildLine():
            CenterArc((FILLET13_R * 0.414213562373, -FILLET13_R), FILLET13_R, 90, 45)
            Line((-FILLET13_R * 0.292893218813, -FILLET13_R * 0.292893218813), (0, 0))
            Line((0, 0), (FILLET13_R * 0.414213562373, 0))
        make_face()
    fillet13_piece_10 = extrude(amount=33.318735204, mode=Mode.PRIVATE)
    fillet13_piece_10 = fillet13_piece_10 - Plane(origin=(-17.7, -17.5, 16), x_dir=(1, 0, 0), z_dir=(0, 0, -1)) * Cylinder(1.9, 69, mode=Mode.PRIVATE)
    fillet13_piece_10 = fillet13_piece_10 - Plane(origin=(-17.7, -52.5, 16), x_dir=(-1, 0, 0), z_dir=(0, 0, -1)) * Cylinder(1.9, 69, mode=Mode.PRIVATE)
    add(fillet13_piece_10)
    with BuildSketch(Plane(origin=(14.6, -51.659367602, 16), x_dir=(0.7071067811865475, 0, -0.7071067811865475), z_dir=(0, 1, 0))) as fillet13_piece_11_section:
        with BuildLine():
            CenterArc((FILLET13_R * 0.414213562373, FILLET13_R), FILLET13_R, 225, 45)
            Line((-FILLET13_R * 0.292893218813, FILLET13_R * 0.292893218813), (0, 0))
            Line((0, 0), (FILLET13_R * 0.414213562373, 0))
        make_face()
    fillet13_piece_11 = extrude(amount=33.318735204, mode=Mode.PRIVATE)
    fillet13_piece_11 = fillet13_piece_11 - Plane(origin=(14.3, -52.5, 16), x_dir=(1, 0, 0), z_dir=(0, 0, -1)) * Cylinder(1.9, 69, mode=Mode.PRIVATE)
    fillet13_piece_11 = fillet13_piece_11 - Plane(origin=(14.3, -17.5, 16), x_dir=(-1, 0, 0), z_dir=(0, 0, -1)) * Cylinder(1.9, 69, mode=Mode.PRIVATE)
    add(fillet13_piece_11)


solid = part_1.part
